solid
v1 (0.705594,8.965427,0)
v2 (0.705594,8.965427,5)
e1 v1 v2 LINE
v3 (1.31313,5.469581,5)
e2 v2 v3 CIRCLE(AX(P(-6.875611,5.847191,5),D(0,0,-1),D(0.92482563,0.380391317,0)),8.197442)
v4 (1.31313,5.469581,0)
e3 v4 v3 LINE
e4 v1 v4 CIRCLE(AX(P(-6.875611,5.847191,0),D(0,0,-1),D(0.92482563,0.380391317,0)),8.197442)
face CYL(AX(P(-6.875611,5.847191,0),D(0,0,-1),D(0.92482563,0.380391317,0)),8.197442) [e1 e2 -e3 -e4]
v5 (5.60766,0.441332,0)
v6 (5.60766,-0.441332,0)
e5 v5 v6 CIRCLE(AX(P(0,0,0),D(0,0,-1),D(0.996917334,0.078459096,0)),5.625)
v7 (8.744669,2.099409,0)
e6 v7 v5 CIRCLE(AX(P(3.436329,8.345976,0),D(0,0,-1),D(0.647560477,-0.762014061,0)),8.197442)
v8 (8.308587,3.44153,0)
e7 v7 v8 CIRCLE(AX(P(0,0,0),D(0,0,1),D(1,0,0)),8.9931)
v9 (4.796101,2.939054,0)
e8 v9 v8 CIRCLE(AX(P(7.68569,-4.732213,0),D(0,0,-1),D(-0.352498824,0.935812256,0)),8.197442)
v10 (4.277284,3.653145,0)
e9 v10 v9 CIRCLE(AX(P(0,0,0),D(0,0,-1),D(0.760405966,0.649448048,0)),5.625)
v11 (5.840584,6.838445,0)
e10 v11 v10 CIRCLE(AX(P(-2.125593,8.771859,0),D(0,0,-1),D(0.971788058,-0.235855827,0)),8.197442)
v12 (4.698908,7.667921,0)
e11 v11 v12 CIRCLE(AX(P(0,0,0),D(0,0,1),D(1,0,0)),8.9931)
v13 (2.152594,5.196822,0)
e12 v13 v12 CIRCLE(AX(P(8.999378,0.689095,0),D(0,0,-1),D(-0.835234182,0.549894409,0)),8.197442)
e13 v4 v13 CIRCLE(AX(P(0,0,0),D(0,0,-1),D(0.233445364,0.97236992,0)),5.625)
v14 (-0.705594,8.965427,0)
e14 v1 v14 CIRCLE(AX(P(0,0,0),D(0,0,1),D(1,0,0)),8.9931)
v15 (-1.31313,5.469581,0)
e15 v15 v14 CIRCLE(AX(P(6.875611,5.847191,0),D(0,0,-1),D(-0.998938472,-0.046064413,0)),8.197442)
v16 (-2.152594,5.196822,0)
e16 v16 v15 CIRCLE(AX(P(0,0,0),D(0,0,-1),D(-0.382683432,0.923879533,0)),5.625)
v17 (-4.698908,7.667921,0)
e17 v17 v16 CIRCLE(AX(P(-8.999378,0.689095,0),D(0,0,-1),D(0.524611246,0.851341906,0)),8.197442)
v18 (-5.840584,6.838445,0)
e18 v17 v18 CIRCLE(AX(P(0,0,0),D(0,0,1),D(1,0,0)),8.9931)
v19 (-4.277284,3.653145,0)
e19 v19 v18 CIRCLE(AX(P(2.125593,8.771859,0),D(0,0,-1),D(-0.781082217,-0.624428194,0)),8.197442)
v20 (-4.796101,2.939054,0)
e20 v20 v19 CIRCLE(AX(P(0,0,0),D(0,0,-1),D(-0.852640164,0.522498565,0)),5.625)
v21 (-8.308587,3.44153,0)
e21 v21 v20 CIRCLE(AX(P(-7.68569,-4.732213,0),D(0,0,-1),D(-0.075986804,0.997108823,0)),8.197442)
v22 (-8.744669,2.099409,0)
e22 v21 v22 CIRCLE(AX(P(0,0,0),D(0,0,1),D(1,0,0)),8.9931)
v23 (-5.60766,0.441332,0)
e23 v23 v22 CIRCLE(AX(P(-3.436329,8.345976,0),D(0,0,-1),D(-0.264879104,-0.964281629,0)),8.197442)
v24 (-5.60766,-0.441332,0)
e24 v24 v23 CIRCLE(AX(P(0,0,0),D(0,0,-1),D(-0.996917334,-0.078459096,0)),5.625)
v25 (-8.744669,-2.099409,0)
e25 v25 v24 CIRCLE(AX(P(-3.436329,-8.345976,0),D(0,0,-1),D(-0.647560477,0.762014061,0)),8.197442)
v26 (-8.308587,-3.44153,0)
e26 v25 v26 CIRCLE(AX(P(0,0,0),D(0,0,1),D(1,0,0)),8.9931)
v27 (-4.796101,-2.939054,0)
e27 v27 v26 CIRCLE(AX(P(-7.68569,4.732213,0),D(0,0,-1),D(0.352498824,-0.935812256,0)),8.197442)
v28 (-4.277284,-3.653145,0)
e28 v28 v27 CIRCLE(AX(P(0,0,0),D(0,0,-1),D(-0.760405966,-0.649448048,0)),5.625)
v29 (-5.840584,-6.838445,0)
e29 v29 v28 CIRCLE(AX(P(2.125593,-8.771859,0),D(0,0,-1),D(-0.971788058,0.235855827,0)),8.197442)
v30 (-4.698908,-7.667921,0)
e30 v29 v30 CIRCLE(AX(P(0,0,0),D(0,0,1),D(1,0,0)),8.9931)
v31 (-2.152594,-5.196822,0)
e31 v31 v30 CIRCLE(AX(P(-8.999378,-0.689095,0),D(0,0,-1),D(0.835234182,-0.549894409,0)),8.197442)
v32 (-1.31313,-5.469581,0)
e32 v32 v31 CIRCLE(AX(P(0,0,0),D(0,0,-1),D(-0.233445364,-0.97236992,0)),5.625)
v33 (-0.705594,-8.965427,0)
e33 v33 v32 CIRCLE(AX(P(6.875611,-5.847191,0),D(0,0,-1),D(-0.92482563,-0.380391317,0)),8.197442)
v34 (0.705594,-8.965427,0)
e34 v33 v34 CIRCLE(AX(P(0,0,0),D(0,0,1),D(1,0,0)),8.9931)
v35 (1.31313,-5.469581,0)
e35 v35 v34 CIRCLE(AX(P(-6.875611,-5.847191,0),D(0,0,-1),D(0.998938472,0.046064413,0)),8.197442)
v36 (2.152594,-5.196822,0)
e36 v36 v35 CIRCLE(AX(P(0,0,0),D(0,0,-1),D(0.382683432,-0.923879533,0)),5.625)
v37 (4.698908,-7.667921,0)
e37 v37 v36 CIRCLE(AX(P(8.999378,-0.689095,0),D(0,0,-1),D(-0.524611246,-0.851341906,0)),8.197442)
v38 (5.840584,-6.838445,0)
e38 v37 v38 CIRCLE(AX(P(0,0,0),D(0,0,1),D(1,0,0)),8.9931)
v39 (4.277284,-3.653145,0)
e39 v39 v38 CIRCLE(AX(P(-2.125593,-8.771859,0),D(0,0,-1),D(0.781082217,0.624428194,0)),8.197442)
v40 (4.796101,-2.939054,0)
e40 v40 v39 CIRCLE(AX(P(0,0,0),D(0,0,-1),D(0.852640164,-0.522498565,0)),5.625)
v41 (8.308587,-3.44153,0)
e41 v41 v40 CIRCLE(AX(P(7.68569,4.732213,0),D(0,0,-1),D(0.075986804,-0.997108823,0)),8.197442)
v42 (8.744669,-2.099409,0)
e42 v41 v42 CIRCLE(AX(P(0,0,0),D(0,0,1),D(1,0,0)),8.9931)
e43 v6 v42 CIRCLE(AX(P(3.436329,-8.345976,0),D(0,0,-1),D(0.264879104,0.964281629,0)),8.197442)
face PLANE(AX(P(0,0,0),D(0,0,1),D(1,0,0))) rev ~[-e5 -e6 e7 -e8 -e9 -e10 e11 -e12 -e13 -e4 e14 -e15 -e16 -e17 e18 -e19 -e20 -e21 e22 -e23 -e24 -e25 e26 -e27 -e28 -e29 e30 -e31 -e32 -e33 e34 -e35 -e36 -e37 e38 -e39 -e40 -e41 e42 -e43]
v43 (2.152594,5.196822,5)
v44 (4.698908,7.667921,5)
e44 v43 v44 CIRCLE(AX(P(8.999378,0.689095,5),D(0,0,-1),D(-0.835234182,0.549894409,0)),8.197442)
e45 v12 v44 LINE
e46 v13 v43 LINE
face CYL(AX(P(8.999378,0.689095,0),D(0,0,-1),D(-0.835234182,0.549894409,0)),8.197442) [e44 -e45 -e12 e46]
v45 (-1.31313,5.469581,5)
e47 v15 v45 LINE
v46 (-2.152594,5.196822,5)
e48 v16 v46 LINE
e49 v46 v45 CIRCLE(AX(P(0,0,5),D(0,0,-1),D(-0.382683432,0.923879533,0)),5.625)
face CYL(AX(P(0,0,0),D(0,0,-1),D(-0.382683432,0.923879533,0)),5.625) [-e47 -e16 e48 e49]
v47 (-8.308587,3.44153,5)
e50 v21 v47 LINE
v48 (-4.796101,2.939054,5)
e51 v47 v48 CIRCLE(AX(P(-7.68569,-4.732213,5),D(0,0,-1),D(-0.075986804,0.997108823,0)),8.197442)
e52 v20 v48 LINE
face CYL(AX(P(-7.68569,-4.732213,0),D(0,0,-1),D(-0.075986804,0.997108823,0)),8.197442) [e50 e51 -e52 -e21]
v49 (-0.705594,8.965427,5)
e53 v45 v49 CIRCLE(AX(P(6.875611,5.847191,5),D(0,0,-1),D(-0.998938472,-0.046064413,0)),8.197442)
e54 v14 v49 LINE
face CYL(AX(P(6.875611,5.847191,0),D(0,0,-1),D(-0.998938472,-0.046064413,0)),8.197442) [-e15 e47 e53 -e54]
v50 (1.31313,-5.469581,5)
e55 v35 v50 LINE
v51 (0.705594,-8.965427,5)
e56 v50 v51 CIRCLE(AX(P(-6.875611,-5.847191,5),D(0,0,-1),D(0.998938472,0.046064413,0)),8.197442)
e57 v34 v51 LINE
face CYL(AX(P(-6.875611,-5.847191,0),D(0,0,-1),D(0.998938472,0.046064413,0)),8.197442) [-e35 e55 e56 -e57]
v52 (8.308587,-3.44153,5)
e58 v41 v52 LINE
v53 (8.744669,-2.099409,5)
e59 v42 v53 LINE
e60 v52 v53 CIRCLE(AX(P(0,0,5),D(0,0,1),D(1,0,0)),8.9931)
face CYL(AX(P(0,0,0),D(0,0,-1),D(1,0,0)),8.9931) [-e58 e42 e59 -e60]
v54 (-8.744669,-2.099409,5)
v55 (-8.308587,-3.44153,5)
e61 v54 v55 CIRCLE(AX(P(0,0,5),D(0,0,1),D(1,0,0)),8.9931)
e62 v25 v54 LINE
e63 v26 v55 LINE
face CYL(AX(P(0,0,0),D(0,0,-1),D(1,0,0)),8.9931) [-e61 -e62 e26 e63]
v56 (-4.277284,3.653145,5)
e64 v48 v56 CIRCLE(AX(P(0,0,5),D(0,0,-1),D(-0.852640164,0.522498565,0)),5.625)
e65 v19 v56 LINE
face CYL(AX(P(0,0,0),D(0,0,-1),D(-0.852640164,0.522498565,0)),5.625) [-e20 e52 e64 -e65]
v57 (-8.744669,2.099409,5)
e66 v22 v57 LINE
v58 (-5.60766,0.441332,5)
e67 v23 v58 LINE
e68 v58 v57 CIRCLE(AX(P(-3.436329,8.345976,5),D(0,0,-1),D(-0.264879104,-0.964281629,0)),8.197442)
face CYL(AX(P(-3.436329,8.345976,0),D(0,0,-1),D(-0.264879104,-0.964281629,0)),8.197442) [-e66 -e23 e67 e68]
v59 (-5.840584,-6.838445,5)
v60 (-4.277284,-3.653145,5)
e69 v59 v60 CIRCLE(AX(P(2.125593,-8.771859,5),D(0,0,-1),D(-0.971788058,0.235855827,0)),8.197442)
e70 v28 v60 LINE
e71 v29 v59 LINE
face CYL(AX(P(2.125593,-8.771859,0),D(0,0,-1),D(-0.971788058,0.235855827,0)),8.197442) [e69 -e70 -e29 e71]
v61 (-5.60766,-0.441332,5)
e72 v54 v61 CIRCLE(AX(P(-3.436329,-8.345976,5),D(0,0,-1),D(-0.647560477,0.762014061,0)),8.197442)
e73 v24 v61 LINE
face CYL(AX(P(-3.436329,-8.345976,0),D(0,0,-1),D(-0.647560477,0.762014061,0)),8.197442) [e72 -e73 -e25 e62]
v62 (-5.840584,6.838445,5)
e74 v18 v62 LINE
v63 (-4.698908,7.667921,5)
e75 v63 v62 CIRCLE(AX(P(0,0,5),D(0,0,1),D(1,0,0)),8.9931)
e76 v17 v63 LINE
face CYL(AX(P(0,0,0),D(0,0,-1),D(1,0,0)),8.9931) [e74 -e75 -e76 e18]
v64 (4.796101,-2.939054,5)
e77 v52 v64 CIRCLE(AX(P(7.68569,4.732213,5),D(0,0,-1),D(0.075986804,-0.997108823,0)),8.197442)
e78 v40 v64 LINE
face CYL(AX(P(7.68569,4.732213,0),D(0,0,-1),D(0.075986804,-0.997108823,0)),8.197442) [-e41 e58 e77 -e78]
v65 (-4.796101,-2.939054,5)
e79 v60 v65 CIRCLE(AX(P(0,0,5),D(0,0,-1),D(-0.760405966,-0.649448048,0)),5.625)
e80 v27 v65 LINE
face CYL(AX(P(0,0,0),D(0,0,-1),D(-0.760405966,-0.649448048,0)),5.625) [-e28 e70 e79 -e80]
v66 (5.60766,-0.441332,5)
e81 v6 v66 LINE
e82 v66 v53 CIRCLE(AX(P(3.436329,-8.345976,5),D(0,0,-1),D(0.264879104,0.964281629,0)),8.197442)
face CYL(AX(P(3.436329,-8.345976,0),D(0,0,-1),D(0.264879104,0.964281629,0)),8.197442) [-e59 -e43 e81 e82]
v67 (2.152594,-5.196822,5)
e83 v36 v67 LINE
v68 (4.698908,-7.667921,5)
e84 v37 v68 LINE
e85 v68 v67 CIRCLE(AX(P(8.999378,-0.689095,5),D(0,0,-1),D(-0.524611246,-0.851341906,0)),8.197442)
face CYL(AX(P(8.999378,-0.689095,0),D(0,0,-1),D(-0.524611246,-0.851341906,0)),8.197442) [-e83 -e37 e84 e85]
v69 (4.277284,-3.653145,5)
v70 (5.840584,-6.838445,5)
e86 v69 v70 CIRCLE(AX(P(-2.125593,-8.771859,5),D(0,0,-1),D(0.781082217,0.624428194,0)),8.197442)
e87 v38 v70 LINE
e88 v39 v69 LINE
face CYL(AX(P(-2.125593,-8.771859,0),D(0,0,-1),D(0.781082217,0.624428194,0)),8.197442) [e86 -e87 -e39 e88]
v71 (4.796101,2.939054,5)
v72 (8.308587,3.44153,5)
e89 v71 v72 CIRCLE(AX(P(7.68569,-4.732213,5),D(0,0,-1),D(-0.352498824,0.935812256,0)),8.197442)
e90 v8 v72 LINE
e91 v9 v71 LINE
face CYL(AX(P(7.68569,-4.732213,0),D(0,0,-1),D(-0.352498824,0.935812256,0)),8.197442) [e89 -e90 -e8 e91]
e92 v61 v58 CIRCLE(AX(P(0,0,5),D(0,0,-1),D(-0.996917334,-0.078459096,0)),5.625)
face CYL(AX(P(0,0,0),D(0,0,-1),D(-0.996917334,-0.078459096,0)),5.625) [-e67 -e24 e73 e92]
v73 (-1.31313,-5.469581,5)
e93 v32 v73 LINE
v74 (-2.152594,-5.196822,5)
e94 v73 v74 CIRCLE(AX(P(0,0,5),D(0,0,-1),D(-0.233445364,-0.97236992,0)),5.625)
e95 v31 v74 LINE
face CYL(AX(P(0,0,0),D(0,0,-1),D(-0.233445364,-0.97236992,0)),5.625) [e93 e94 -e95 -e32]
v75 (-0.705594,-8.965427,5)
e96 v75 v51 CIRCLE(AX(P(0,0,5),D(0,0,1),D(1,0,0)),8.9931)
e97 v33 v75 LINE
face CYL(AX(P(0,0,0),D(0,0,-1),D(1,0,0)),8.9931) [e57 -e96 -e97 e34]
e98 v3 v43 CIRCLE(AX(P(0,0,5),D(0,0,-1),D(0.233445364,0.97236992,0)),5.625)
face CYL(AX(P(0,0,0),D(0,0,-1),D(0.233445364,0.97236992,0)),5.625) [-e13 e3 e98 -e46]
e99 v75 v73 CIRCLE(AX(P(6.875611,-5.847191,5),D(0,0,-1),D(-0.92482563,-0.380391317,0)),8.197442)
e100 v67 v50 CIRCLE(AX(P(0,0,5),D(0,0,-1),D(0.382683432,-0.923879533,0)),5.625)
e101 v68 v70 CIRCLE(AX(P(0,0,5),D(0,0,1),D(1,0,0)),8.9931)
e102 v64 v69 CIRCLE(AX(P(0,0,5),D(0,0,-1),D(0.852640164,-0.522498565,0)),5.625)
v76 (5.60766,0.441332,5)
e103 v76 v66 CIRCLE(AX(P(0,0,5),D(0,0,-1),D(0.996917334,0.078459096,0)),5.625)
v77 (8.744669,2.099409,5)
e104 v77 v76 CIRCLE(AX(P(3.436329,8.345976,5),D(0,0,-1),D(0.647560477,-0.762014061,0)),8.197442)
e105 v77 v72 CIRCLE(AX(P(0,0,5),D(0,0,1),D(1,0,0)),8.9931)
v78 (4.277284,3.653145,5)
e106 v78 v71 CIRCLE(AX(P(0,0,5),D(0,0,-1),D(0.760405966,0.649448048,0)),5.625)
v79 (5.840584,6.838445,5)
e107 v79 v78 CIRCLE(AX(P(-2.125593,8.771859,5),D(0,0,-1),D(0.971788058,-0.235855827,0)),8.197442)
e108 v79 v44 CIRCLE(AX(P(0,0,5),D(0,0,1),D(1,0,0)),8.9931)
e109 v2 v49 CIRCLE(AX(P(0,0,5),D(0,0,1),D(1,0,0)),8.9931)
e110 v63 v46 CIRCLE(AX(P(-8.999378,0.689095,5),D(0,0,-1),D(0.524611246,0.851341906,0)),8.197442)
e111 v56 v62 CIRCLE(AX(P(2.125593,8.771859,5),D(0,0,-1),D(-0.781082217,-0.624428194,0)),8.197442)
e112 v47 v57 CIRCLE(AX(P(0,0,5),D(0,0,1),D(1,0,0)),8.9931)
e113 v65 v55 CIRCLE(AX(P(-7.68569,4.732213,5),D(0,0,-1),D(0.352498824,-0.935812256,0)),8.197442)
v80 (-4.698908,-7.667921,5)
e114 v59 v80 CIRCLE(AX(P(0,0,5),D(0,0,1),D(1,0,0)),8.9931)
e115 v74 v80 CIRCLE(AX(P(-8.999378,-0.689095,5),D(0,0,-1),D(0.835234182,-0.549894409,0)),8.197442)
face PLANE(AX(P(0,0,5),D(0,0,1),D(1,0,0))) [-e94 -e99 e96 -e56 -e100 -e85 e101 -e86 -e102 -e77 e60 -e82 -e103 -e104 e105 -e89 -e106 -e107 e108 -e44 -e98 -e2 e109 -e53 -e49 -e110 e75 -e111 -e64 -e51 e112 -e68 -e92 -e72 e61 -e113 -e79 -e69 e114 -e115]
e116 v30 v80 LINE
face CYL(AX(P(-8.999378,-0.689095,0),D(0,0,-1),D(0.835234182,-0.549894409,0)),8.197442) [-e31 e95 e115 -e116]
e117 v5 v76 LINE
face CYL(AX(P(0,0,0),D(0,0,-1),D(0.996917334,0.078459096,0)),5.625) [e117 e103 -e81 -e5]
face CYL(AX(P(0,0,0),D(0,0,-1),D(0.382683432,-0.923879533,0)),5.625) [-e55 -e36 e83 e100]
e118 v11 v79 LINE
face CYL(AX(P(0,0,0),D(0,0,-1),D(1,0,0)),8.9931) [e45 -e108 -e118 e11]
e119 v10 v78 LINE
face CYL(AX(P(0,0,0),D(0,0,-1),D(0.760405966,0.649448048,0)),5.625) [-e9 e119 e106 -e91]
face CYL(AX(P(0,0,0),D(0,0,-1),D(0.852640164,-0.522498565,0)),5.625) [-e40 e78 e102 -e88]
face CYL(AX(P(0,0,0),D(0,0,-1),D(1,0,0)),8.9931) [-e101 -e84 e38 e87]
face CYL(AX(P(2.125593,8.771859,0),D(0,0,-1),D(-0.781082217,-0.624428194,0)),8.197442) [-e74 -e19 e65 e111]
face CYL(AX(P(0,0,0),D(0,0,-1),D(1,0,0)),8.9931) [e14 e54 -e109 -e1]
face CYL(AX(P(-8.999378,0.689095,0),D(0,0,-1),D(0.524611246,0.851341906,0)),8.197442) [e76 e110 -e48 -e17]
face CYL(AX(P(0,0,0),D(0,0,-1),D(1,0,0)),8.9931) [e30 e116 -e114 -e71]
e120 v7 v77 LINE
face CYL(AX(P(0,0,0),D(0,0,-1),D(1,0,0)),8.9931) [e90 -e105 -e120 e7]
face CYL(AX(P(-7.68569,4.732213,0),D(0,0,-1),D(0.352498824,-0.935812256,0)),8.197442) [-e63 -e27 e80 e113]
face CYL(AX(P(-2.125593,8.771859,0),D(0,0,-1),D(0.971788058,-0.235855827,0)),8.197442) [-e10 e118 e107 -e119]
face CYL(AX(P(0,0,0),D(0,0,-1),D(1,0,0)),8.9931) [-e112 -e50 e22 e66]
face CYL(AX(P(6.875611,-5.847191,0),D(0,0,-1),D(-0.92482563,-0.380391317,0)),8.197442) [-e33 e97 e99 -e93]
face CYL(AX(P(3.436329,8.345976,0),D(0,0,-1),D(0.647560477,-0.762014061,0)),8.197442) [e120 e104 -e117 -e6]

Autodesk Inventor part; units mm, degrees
sketch "Sketch1" plane through (0, 0, 0) normal (0, 0, 1) x (1, 0, 0)
  circle A0 centre (0, 0) radius 8.9931
  dimension "d0" = 17.9863
extrude "Extrusion1" add sketch "Sketch1" along normal blind 5
ref_plane "Work Plane2" through (0, 0, 2.5) normal (0, 0, 1) x (1, 0, 0)
sketch "Sketch2" plane through (0, 0, 0) normal (0, 0, -1) x (-1, 0, 0)
  circle A0 centre (0, 0) radius 8.9931 projected
  circle A1 centre (0, 0) radius 7.5
  dimension "d3" = 15
surface extrude "Средний диаметр" sketch "Sketch2" against normal through all shown no curves A1
ref_plane "Work Plane8" through (0, 0, 0) normal (0.9510565, 0.309017, 0) x (0, 0, 1)
ref_plane "Work Plane9" through (0, 0, 0) normal (1, 0, 0) x (0, 1, 0)
spur gear teeth "Цилиндрическое зубчатое зацепление" teeth 10 pitch diameter 15 tip diameter 17.9863 root diameter 11.25 face width 5 start plane through (0, 0, 0) normal (0, 0, -1) x (-1, 0, 0)
equation "\"d0\" = da_da"
equation "\"d1\" = da_b"
equation "\"d3\" = da_d"
equation "\"d16\" = da_aw"
equation "\"d43\" = da_aw"
equation "\"d46\" = da_aw"
equation "\"da_da\" = 17.98627"
equation "\"da_b\" = 5"
equation "\"da_d\" = 15"
equation "\"da_aw\" = 38.516933"
properties part number "Цилиндрическое зубчатое зацепление1" material "Steel"
